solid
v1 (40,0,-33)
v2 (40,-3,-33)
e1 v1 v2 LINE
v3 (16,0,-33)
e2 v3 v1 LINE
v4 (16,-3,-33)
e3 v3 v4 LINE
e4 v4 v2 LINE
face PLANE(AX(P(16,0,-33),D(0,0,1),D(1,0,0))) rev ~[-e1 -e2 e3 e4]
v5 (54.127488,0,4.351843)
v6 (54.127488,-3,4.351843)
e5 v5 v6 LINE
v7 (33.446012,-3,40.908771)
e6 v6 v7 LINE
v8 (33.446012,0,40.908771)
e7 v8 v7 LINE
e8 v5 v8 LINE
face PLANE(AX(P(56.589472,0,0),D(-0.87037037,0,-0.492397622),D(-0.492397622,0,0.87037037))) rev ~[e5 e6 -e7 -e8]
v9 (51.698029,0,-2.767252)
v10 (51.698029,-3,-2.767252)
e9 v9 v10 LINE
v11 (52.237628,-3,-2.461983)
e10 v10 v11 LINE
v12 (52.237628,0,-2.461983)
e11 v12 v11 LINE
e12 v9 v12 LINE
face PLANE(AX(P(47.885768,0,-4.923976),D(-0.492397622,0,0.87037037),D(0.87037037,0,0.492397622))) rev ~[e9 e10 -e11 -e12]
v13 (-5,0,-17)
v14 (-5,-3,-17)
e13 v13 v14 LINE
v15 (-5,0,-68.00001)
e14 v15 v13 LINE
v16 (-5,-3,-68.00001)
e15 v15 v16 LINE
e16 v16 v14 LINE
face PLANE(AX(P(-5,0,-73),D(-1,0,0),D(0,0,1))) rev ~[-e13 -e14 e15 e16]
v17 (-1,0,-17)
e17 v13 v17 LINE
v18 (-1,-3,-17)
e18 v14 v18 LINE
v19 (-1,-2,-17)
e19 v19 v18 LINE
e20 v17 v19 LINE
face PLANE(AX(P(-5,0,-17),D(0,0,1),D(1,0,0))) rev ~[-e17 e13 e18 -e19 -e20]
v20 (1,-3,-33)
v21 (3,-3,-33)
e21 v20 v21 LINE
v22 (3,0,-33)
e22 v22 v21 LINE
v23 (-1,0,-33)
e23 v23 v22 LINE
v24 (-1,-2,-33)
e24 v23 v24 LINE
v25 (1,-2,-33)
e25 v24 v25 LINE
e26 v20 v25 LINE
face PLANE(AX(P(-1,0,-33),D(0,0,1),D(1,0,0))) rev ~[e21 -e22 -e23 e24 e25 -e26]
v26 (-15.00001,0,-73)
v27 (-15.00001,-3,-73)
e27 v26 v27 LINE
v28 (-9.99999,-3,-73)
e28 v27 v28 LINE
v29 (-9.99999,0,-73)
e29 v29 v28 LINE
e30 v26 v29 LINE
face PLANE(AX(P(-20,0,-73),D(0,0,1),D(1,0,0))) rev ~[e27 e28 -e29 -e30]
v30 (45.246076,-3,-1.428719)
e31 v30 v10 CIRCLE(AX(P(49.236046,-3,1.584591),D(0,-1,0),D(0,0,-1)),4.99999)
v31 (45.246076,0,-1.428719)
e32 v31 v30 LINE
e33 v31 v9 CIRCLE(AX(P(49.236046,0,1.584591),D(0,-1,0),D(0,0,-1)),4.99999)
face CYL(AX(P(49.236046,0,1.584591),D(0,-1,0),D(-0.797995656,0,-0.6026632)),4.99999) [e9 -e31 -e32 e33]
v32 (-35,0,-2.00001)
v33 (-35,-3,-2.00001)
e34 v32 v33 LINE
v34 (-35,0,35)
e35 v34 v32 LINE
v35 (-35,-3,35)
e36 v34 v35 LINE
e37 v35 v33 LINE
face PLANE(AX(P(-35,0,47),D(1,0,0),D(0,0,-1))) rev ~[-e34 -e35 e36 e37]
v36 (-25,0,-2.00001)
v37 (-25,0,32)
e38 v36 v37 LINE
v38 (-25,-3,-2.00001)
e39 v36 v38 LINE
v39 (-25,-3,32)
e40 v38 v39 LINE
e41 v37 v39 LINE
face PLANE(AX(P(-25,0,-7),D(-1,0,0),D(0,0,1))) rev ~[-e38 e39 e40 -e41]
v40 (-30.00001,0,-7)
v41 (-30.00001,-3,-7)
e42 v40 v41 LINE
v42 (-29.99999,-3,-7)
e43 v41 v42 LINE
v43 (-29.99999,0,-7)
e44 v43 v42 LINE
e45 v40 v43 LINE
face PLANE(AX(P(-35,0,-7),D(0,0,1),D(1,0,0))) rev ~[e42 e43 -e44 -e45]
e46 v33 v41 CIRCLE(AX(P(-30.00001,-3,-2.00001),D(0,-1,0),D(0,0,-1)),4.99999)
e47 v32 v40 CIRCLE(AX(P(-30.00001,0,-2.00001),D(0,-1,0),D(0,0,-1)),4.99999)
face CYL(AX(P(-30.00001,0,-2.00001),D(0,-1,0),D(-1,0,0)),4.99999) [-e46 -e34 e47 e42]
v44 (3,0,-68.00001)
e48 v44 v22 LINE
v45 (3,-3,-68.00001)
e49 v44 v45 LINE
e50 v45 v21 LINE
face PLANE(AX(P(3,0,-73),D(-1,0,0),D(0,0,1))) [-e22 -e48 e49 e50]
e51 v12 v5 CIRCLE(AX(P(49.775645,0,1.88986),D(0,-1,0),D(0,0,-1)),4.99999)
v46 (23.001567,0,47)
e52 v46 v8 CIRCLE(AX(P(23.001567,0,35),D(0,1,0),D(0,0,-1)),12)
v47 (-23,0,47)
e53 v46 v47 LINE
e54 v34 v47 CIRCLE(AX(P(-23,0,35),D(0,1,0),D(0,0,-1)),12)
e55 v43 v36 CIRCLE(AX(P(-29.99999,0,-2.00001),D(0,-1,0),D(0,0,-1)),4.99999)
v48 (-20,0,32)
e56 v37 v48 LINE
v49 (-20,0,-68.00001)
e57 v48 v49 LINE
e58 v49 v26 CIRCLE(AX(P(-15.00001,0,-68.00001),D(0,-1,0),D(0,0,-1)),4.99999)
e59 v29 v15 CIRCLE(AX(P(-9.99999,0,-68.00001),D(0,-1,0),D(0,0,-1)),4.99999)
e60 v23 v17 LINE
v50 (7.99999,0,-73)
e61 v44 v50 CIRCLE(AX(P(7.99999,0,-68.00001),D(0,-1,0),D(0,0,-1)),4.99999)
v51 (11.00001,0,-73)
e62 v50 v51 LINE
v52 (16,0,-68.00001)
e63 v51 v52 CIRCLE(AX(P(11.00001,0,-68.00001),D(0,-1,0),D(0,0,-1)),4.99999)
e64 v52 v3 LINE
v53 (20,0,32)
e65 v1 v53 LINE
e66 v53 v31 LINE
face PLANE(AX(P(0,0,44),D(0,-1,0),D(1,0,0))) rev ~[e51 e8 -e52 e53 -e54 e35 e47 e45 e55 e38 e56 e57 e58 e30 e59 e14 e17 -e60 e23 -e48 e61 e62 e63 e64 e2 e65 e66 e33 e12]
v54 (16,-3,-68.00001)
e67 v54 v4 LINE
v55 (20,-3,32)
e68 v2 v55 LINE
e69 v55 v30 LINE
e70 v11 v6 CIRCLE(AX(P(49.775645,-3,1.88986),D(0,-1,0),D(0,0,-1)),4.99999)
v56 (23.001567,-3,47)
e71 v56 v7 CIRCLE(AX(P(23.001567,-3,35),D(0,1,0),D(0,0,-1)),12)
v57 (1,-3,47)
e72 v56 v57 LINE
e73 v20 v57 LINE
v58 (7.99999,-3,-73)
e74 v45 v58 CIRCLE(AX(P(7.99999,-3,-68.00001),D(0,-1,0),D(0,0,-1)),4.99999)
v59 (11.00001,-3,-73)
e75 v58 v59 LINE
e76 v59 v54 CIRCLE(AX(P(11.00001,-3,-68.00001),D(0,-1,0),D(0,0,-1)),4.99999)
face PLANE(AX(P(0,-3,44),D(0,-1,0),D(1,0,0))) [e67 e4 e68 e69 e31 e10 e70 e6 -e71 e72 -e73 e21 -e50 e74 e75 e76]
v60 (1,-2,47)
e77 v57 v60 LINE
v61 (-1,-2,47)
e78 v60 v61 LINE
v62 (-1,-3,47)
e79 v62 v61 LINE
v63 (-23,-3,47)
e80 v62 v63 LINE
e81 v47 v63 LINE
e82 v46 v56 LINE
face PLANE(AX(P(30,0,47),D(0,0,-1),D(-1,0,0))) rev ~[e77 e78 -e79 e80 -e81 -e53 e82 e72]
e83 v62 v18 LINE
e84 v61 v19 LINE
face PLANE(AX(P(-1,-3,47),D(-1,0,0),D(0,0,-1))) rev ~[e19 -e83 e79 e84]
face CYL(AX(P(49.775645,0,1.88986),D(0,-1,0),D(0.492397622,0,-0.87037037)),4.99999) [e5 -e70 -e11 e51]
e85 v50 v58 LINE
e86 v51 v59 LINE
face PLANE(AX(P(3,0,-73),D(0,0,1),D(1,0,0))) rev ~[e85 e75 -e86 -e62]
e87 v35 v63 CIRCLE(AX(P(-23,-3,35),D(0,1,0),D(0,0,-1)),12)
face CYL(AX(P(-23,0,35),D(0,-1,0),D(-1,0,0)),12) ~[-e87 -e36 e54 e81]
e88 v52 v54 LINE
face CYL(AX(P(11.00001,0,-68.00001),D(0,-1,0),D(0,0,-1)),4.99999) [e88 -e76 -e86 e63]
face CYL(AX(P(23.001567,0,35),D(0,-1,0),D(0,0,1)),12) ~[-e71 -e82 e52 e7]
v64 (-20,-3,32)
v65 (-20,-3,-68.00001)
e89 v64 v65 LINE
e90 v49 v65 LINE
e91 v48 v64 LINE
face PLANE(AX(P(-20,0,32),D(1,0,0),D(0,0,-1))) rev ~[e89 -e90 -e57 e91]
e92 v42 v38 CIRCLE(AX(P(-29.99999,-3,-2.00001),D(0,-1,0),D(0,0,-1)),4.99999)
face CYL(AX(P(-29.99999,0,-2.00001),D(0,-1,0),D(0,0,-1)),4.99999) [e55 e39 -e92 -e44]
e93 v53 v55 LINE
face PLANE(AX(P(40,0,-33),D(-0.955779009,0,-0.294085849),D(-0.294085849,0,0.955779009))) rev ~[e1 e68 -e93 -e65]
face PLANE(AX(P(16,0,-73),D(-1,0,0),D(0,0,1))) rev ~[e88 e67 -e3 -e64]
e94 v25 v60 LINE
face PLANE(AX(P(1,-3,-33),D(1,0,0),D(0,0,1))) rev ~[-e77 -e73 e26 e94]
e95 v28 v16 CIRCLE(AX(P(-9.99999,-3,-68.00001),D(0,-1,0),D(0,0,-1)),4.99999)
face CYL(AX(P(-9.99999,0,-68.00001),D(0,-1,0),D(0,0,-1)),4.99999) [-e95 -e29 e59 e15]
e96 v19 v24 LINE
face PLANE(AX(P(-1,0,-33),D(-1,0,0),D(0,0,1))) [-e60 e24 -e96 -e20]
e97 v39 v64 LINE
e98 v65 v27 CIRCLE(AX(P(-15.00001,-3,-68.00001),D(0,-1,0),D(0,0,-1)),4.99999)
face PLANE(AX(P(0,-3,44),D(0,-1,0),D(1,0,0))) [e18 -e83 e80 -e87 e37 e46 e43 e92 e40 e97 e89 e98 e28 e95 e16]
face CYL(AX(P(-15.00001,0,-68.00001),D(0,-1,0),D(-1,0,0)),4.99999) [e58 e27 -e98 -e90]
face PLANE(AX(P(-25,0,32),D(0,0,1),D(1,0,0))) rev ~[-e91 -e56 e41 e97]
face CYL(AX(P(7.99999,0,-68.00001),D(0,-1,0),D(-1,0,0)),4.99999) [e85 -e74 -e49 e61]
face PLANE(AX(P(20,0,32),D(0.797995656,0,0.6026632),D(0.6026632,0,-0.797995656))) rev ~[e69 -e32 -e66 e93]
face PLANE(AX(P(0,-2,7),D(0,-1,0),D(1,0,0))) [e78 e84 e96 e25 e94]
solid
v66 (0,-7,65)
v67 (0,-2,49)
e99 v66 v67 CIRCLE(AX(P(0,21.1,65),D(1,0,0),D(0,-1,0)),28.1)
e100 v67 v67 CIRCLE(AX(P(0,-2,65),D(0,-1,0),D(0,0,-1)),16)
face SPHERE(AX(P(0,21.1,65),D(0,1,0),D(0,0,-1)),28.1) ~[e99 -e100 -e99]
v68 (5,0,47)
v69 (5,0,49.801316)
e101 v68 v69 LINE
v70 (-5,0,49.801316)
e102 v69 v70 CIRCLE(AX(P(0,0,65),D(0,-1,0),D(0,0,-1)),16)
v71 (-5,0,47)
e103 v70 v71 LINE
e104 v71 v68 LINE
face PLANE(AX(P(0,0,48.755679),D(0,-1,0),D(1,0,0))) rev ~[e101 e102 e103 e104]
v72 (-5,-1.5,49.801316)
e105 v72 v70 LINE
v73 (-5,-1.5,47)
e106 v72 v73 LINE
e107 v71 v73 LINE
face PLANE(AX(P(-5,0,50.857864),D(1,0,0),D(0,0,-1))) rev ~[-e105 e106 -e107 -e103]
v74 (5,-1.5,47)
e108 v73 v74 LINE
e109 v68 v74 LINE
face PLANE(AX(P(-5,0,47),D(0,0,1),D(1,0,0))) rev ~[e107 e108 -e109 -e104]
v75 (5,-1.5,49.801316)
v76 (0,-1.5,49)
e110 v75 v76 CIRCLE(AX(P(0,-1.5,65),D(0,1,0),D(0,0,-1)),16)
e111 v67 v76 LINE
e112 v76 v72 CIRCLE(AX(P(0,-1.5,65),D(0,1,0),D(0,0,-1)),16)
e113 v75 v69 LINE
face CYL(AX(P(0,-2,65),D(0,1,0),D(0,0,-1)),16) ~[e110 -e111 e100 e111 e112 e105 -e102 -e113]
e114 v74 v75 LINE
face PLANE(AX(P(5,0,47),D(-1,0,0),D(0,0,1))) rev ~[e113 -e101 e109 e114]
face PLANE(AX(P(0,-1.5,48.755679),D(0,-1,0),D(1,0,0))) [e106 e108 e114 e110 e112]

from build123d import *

# Parameters (mm, degrees)
F0_W     = 10
F0_H     = 6
F0_W_2   = 13
F0_H_2   = 16
F0_W_3   = 4
F0_H_3   = 40
F1_DEPTH = 3
F2_R     = 4.99999
F3_DEPTH = 1.5
F4_R     = 12
F8_DEPTH = 1


# Not quite as in the source:
# - a fillet or chamfer is up to 0.001 mm smaller than in the source, because OpenCascade refuses the exact size


with BuildPart() as f1:
    # F0 (on Front) → F1 (new body)
    with BuildSketch(Plane.XZ):
        with Locations((0, 44)):
            Rectangle(F0_W, F0_H)
        Polygon((-5, 41), (-5, 47), (-20, 47), (-20, 32), (-20, -7), (-20, -73), (-5, -73), (-5, -17), (-1, -17), (3, -17), (16, -17), (16, -33), (20, -33), (20, 32), (20, 47), (5, 47), (5, 41), align=None)
        Polygon((-20, 32), (-20, 47), (-35, 47), (-35, -7), (-25, -7), (-25, 32), align=None)
        Polygon((40, -33), (20, 32), (20, -33), align=None)
        Polygon((30, 47), (20, 47), (20, 32), (47.8857678969, -4.9239762223), (56.5894716006, 0), align=None)
        with Locations((9.5, -25)):
            Rectangle(F0_W_2, F0_H_2)
        with Locations((1, -25)):
            Rectangle(F0_W_3, F0_H_2)
        with Locations((9.5, -53)):
            Rectangle(F0_W_2, F0_H_3)
    extrude(amount=F1_DEPTH)

    # F2 (radius 5 in the source; OpenCascade refuses exactly that, so slightly less here)
    f2_edges = [f1.edges().sort_by_distance(p)[0] for p in [
        (56.589472, -1.5, 0),
        (47.885768, -1.5, -4.923976),
        (-25, -1.5, -7),
        (-35, -1.5, -7),
        (16, -1.5, -73),
        (3, -1.5, -73),
        (-20, -1.5, -73),
        (-5, -1.5, -73),
    ]]
    fillet(f2_edges, radius=F2_R)

    # F4
    f4_edges = [f1.edges().sort_by_distance(p)[0] for p in [
        (30, -1.5, 47),
        (-35, -1.5, 47),
    ]]
    fillet(f4_edges, radius=F4_R)

    # F7 (on face) → F8 (cut)
    with BuildSketch(Plane.XZ.offset(3)):
        Polygon((-1, -17), (-1, -33), (1, -33), (1, 47), (-1, 47), align=None)
    extrude(amount=-F8_DEPTH, mode=Mode.SUBTRACT)


with BuildPart() as f3:
    # F0 (on Front) → F3 (new body)
    with BuildSketch(Plane.XZ):
        with BuildLine():
            ThreePointArc((5, 50.8578643763), (0, 50), (-5, 50.8578643763))
            Line((-5, 50.8578643763), (-5, 47))
            Line((-5, 47), (5, 47))
            Line((5, 47), (5, 50.8578643763))
        make_face()
    extrude(amount=F3_DEPTH)

    # F5 (on Right) → F6 (revolve)
    with BuildSketch(Plane.YZ):
        with BuildLine():
            Line((0, 49), (0, 65))
            Line((0, 65), (-7, 65))
            ThreePointArc((-7, 65), (-5.7208873828, 56.6184726929), (-2, 49))
            Line((-2, 49), (0, 49))
        make_face()
    revolve(axis=Axis((0, -3.5, 65), (0, -1, 0)))


solid = Compound([f1.part, f3.part])
